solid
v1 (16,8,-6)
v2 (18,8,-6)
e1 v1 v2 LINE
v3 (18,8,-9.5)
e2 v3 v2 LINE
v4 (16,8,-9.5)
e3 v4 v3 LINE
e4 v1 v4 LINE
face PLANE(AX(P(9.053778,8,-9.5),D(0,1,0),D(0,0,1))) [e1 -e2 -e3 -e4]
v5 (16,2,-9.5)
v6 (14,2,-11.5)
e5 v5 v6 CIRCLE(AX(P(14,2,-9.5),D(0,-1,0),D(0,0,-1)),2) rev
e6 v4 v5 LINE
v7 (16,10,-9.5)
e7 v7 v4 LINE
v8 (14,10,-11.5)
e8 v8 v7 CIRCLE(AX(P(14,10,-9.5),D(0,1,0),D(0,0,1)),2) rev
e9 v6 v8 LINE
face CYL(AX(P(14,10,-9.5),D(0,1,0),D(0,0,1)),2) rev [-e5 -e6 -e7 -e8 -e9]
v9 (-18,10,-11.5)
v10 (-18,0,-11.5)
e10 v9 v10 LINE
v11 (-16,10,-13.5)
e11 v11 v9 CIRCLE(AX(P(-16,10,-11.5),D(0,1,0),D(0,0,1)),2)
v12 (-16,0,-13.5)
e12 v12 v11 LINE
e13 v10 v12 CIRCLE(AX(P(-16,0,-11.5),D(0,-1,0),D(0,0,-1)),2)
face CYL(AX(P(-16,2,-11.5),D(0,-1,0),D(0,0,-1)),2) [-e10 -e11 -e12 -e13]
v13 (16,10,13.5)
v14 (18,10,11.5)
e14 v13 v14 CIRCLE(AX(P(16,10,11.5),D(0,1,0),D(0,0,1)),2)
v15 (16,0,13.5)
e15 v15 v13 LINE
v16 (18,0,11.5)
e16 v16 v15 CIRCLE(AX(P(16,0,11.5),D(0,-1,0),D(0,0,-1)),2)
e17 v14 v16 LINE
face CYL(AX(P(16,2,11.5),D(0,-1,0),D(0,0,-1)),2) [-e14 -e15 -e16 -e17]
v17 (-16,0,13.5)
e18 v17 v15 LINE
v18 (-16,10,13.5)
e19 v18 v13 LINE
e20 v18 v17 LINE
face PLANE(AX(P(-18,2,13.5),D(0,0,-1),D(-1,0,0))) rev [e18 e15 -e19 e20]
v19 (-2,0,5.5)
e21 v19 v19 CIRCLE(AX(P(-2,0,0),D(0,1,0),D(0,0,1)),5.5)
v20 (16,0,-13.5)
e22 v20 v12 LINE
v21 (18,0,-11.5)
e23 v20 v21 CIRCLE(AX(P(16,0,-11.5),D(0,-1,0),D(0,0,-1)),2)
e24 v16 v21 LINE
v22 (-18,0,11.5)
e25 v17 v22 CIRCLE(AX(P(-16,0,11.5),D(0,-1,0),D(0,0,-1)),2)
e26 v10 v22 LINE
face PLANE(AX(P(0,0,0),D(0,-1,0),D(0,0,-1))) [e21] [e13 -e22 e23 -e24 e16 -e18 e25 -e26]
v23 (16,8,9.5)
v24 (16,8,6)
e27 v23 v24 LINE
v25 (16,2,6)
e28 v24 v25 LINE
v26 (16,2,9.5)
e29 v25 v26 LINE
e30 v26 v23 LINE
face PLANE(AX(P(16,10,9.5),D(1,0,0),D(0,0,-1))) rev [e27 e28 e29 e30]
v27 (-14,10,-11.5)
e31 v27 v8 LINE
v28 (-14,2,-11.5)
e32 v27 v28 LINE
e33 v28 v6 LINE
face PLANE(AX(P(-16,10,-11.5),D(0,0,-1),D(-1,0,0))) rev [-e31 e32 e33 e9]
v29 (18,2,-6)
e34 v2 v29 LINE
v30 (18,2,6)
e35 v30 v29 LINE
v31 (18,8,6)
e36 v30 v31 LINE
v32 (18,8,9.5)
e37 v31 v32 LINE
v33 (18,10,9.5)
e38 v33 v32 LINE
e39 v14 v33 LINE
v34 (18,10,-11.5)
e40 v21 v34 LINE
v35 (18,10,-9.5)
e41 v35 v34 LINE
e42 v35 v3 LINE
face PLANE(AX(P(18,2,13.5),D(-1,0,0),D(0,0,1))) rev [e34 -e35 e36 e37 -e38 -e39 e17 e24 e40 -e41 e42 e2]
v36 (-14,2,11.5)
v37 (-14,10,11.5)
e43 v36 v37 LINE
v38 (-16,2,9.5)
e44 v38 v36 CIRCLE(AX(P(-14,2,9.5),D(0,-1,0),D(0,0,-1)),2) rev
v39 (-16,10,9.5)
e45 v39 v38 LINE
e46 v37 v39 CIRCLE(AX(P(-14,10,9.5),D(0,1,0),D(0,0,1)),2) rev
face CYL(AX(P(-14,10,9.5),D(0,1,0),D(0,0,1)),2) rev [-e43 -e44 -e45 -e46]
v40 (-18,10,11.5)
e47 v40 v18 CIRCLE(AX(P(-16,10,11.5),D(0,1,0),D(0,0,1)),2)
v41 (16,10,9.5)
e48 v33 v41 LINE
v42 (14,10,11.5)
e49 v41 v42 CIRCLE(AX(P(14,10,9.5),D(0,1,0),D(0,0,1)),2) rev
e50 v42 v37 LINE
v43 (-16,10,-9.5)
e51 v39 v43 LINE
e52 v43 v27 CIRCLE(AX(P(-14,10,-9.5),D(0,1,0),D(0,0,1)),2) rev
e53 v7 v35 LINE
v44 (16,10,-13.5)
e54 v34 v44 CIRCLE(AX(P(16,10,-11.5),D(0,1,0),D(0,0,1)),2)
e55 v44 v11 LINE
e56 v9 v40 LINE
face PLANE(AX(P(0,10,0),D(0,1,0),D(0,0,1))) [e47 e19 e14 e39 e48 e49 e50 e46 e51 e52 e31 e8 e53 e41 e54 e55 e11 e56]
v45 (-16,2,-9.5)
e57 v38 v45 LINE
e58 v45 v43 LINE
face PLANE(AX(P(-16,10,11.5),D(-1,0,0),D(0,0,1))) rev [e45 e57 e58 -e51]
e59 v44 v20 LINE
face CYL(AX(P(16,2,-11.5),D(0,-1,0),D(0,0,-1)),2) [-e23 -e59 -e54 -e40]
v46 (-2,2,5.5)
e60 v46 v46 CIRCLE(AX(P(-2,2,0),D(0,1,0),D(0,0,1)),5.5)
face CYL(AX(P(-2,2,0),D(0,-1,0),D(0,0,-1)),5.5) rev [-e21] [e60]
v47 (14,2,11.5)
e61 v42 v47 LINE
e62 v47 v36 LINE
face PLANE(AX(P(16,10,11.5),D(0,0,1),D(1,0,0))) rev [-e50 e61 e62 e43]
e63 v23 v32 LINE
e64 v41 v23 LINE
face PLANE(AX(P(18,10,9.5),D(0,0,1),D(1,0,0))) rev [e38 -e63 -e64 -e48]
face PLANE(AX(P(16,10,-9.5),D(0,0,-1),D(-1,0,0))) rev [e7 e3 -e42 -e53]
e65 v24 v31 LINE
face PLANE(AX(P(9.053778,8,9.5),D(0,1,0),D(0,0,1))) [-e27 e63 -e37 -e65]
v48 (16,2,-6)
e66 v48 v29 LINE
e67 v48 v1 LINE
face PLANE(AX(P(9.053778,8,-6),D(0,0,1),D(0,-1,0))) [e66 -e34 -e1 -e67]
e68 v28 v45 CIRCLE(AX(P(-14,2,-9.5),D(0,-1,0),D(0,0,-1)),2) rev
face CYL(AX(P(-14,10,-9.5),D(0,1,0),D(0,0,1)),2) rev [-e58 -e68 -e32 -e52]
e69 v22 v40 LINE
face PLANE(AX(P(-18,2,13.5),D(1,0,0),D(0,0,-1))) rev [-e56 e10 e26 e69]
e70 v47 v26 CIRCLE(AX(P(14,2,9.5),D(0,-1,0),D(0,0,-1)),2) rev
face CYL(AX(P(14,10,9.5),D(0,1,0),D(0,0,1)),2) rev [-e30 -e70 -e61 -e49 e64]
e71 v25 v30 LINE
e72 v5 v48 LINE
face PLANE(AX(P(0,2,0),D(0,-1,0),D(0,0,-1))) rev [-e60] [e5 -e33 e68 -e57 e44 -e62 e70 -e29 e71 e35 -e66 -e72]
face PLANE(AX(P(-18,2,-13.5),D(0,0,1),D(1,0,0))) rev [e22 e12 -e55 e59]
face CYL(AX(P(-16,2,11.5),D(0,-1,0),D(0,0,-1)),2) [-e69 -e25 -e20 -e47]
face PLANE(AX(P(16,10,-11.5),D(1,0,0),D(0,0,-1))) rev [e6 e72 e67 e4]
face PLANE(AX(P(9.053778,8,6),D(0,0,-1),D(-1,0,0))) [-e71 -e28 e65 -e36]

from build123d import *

# Parameters (mm, degrees)
SKETCH1_W           = 36
SKETCH1_H           = 27
SKETCH1_R           = 5.5
BOSS_EXTRUDE1_DEPTH = 2
BOSS_EXTRUDE2_DEPTH = 8
SKETCH3_W           = 3.5
SKETCH3_H           = 6
BOSS_EXTRUDE3_DEPTH = 2
FILLET2_R           = 2


with BuildPart() as part:
    # Sketch1 → Boss-Extrude1 (new body)
    with BuildSketch(Plane(origin=(0, 0, 0), x_dir=(1, 0, 0), z_dir=(0, 1, 0))):
        Rectangle(SKETCH1_W, SKETCH1_H)
        with Locations(Location((-2, 0, 0), (0, 0, 270))):
            Circle(SKETCH1_R, mode=Mode.SUBTRACT)
    extrude(amount=BOSS_EXTRUDE1_DEPTH)

    # Sketch2 → Boss-Extrude2 (add)
    with BuildSketch(Plane(origin=(0, 2, 0), x_dir=(1, 0, 0), z_dir=(0, 1, 0))):
        Polygon((18, 13.5), (-18, 13.5), (-18, -13.5), (18, -13.5), (18, -9.5), (16, -9.5), (16, -11.5), (-16, -11.5), (-16, 11.5), (16, 11.5), (16, 9.5), (18, 9.5), align=None)
    extrude(amount=BOSS_EXTRUDE2_DEPTH)

    # Sketch3 → Boss-Extrude3 (add)
    with BuildSketch(Plane(origin=(18, 0, 0), x_dir=(0, 0, -1), z_dir=(1, 0, 0))):
        with Locations((-7.75, 5)):
            Rectangle(SKETCH3_W, SKETCH3_H)
        with Locations((7.75, 5)):
            Rectangle(SKETCH3_W, SKETCH3_H)
    extrude(amount=-BOSS_EXTRUDE3_DEPTH)

    # Fillet2
    fillet2_edges = [part.edges().sort_by_distance(p)[0] for p in [
        (-18, 5, 13.5),
        (-18, 5, -13.5),
        (18, 5, -13.5),
        (18, 5, 13.5),
        (16, 6, -11.5),
        (16, 6, 11.5),
        (-16, 6, 11.5),
        (-16, 6, -11.5),
    ]]
    fillet(fillet2_edges, radius=FILLET2_R - 0.0001)  # a hair under: the kernel refuses the full size


solid = part.part
